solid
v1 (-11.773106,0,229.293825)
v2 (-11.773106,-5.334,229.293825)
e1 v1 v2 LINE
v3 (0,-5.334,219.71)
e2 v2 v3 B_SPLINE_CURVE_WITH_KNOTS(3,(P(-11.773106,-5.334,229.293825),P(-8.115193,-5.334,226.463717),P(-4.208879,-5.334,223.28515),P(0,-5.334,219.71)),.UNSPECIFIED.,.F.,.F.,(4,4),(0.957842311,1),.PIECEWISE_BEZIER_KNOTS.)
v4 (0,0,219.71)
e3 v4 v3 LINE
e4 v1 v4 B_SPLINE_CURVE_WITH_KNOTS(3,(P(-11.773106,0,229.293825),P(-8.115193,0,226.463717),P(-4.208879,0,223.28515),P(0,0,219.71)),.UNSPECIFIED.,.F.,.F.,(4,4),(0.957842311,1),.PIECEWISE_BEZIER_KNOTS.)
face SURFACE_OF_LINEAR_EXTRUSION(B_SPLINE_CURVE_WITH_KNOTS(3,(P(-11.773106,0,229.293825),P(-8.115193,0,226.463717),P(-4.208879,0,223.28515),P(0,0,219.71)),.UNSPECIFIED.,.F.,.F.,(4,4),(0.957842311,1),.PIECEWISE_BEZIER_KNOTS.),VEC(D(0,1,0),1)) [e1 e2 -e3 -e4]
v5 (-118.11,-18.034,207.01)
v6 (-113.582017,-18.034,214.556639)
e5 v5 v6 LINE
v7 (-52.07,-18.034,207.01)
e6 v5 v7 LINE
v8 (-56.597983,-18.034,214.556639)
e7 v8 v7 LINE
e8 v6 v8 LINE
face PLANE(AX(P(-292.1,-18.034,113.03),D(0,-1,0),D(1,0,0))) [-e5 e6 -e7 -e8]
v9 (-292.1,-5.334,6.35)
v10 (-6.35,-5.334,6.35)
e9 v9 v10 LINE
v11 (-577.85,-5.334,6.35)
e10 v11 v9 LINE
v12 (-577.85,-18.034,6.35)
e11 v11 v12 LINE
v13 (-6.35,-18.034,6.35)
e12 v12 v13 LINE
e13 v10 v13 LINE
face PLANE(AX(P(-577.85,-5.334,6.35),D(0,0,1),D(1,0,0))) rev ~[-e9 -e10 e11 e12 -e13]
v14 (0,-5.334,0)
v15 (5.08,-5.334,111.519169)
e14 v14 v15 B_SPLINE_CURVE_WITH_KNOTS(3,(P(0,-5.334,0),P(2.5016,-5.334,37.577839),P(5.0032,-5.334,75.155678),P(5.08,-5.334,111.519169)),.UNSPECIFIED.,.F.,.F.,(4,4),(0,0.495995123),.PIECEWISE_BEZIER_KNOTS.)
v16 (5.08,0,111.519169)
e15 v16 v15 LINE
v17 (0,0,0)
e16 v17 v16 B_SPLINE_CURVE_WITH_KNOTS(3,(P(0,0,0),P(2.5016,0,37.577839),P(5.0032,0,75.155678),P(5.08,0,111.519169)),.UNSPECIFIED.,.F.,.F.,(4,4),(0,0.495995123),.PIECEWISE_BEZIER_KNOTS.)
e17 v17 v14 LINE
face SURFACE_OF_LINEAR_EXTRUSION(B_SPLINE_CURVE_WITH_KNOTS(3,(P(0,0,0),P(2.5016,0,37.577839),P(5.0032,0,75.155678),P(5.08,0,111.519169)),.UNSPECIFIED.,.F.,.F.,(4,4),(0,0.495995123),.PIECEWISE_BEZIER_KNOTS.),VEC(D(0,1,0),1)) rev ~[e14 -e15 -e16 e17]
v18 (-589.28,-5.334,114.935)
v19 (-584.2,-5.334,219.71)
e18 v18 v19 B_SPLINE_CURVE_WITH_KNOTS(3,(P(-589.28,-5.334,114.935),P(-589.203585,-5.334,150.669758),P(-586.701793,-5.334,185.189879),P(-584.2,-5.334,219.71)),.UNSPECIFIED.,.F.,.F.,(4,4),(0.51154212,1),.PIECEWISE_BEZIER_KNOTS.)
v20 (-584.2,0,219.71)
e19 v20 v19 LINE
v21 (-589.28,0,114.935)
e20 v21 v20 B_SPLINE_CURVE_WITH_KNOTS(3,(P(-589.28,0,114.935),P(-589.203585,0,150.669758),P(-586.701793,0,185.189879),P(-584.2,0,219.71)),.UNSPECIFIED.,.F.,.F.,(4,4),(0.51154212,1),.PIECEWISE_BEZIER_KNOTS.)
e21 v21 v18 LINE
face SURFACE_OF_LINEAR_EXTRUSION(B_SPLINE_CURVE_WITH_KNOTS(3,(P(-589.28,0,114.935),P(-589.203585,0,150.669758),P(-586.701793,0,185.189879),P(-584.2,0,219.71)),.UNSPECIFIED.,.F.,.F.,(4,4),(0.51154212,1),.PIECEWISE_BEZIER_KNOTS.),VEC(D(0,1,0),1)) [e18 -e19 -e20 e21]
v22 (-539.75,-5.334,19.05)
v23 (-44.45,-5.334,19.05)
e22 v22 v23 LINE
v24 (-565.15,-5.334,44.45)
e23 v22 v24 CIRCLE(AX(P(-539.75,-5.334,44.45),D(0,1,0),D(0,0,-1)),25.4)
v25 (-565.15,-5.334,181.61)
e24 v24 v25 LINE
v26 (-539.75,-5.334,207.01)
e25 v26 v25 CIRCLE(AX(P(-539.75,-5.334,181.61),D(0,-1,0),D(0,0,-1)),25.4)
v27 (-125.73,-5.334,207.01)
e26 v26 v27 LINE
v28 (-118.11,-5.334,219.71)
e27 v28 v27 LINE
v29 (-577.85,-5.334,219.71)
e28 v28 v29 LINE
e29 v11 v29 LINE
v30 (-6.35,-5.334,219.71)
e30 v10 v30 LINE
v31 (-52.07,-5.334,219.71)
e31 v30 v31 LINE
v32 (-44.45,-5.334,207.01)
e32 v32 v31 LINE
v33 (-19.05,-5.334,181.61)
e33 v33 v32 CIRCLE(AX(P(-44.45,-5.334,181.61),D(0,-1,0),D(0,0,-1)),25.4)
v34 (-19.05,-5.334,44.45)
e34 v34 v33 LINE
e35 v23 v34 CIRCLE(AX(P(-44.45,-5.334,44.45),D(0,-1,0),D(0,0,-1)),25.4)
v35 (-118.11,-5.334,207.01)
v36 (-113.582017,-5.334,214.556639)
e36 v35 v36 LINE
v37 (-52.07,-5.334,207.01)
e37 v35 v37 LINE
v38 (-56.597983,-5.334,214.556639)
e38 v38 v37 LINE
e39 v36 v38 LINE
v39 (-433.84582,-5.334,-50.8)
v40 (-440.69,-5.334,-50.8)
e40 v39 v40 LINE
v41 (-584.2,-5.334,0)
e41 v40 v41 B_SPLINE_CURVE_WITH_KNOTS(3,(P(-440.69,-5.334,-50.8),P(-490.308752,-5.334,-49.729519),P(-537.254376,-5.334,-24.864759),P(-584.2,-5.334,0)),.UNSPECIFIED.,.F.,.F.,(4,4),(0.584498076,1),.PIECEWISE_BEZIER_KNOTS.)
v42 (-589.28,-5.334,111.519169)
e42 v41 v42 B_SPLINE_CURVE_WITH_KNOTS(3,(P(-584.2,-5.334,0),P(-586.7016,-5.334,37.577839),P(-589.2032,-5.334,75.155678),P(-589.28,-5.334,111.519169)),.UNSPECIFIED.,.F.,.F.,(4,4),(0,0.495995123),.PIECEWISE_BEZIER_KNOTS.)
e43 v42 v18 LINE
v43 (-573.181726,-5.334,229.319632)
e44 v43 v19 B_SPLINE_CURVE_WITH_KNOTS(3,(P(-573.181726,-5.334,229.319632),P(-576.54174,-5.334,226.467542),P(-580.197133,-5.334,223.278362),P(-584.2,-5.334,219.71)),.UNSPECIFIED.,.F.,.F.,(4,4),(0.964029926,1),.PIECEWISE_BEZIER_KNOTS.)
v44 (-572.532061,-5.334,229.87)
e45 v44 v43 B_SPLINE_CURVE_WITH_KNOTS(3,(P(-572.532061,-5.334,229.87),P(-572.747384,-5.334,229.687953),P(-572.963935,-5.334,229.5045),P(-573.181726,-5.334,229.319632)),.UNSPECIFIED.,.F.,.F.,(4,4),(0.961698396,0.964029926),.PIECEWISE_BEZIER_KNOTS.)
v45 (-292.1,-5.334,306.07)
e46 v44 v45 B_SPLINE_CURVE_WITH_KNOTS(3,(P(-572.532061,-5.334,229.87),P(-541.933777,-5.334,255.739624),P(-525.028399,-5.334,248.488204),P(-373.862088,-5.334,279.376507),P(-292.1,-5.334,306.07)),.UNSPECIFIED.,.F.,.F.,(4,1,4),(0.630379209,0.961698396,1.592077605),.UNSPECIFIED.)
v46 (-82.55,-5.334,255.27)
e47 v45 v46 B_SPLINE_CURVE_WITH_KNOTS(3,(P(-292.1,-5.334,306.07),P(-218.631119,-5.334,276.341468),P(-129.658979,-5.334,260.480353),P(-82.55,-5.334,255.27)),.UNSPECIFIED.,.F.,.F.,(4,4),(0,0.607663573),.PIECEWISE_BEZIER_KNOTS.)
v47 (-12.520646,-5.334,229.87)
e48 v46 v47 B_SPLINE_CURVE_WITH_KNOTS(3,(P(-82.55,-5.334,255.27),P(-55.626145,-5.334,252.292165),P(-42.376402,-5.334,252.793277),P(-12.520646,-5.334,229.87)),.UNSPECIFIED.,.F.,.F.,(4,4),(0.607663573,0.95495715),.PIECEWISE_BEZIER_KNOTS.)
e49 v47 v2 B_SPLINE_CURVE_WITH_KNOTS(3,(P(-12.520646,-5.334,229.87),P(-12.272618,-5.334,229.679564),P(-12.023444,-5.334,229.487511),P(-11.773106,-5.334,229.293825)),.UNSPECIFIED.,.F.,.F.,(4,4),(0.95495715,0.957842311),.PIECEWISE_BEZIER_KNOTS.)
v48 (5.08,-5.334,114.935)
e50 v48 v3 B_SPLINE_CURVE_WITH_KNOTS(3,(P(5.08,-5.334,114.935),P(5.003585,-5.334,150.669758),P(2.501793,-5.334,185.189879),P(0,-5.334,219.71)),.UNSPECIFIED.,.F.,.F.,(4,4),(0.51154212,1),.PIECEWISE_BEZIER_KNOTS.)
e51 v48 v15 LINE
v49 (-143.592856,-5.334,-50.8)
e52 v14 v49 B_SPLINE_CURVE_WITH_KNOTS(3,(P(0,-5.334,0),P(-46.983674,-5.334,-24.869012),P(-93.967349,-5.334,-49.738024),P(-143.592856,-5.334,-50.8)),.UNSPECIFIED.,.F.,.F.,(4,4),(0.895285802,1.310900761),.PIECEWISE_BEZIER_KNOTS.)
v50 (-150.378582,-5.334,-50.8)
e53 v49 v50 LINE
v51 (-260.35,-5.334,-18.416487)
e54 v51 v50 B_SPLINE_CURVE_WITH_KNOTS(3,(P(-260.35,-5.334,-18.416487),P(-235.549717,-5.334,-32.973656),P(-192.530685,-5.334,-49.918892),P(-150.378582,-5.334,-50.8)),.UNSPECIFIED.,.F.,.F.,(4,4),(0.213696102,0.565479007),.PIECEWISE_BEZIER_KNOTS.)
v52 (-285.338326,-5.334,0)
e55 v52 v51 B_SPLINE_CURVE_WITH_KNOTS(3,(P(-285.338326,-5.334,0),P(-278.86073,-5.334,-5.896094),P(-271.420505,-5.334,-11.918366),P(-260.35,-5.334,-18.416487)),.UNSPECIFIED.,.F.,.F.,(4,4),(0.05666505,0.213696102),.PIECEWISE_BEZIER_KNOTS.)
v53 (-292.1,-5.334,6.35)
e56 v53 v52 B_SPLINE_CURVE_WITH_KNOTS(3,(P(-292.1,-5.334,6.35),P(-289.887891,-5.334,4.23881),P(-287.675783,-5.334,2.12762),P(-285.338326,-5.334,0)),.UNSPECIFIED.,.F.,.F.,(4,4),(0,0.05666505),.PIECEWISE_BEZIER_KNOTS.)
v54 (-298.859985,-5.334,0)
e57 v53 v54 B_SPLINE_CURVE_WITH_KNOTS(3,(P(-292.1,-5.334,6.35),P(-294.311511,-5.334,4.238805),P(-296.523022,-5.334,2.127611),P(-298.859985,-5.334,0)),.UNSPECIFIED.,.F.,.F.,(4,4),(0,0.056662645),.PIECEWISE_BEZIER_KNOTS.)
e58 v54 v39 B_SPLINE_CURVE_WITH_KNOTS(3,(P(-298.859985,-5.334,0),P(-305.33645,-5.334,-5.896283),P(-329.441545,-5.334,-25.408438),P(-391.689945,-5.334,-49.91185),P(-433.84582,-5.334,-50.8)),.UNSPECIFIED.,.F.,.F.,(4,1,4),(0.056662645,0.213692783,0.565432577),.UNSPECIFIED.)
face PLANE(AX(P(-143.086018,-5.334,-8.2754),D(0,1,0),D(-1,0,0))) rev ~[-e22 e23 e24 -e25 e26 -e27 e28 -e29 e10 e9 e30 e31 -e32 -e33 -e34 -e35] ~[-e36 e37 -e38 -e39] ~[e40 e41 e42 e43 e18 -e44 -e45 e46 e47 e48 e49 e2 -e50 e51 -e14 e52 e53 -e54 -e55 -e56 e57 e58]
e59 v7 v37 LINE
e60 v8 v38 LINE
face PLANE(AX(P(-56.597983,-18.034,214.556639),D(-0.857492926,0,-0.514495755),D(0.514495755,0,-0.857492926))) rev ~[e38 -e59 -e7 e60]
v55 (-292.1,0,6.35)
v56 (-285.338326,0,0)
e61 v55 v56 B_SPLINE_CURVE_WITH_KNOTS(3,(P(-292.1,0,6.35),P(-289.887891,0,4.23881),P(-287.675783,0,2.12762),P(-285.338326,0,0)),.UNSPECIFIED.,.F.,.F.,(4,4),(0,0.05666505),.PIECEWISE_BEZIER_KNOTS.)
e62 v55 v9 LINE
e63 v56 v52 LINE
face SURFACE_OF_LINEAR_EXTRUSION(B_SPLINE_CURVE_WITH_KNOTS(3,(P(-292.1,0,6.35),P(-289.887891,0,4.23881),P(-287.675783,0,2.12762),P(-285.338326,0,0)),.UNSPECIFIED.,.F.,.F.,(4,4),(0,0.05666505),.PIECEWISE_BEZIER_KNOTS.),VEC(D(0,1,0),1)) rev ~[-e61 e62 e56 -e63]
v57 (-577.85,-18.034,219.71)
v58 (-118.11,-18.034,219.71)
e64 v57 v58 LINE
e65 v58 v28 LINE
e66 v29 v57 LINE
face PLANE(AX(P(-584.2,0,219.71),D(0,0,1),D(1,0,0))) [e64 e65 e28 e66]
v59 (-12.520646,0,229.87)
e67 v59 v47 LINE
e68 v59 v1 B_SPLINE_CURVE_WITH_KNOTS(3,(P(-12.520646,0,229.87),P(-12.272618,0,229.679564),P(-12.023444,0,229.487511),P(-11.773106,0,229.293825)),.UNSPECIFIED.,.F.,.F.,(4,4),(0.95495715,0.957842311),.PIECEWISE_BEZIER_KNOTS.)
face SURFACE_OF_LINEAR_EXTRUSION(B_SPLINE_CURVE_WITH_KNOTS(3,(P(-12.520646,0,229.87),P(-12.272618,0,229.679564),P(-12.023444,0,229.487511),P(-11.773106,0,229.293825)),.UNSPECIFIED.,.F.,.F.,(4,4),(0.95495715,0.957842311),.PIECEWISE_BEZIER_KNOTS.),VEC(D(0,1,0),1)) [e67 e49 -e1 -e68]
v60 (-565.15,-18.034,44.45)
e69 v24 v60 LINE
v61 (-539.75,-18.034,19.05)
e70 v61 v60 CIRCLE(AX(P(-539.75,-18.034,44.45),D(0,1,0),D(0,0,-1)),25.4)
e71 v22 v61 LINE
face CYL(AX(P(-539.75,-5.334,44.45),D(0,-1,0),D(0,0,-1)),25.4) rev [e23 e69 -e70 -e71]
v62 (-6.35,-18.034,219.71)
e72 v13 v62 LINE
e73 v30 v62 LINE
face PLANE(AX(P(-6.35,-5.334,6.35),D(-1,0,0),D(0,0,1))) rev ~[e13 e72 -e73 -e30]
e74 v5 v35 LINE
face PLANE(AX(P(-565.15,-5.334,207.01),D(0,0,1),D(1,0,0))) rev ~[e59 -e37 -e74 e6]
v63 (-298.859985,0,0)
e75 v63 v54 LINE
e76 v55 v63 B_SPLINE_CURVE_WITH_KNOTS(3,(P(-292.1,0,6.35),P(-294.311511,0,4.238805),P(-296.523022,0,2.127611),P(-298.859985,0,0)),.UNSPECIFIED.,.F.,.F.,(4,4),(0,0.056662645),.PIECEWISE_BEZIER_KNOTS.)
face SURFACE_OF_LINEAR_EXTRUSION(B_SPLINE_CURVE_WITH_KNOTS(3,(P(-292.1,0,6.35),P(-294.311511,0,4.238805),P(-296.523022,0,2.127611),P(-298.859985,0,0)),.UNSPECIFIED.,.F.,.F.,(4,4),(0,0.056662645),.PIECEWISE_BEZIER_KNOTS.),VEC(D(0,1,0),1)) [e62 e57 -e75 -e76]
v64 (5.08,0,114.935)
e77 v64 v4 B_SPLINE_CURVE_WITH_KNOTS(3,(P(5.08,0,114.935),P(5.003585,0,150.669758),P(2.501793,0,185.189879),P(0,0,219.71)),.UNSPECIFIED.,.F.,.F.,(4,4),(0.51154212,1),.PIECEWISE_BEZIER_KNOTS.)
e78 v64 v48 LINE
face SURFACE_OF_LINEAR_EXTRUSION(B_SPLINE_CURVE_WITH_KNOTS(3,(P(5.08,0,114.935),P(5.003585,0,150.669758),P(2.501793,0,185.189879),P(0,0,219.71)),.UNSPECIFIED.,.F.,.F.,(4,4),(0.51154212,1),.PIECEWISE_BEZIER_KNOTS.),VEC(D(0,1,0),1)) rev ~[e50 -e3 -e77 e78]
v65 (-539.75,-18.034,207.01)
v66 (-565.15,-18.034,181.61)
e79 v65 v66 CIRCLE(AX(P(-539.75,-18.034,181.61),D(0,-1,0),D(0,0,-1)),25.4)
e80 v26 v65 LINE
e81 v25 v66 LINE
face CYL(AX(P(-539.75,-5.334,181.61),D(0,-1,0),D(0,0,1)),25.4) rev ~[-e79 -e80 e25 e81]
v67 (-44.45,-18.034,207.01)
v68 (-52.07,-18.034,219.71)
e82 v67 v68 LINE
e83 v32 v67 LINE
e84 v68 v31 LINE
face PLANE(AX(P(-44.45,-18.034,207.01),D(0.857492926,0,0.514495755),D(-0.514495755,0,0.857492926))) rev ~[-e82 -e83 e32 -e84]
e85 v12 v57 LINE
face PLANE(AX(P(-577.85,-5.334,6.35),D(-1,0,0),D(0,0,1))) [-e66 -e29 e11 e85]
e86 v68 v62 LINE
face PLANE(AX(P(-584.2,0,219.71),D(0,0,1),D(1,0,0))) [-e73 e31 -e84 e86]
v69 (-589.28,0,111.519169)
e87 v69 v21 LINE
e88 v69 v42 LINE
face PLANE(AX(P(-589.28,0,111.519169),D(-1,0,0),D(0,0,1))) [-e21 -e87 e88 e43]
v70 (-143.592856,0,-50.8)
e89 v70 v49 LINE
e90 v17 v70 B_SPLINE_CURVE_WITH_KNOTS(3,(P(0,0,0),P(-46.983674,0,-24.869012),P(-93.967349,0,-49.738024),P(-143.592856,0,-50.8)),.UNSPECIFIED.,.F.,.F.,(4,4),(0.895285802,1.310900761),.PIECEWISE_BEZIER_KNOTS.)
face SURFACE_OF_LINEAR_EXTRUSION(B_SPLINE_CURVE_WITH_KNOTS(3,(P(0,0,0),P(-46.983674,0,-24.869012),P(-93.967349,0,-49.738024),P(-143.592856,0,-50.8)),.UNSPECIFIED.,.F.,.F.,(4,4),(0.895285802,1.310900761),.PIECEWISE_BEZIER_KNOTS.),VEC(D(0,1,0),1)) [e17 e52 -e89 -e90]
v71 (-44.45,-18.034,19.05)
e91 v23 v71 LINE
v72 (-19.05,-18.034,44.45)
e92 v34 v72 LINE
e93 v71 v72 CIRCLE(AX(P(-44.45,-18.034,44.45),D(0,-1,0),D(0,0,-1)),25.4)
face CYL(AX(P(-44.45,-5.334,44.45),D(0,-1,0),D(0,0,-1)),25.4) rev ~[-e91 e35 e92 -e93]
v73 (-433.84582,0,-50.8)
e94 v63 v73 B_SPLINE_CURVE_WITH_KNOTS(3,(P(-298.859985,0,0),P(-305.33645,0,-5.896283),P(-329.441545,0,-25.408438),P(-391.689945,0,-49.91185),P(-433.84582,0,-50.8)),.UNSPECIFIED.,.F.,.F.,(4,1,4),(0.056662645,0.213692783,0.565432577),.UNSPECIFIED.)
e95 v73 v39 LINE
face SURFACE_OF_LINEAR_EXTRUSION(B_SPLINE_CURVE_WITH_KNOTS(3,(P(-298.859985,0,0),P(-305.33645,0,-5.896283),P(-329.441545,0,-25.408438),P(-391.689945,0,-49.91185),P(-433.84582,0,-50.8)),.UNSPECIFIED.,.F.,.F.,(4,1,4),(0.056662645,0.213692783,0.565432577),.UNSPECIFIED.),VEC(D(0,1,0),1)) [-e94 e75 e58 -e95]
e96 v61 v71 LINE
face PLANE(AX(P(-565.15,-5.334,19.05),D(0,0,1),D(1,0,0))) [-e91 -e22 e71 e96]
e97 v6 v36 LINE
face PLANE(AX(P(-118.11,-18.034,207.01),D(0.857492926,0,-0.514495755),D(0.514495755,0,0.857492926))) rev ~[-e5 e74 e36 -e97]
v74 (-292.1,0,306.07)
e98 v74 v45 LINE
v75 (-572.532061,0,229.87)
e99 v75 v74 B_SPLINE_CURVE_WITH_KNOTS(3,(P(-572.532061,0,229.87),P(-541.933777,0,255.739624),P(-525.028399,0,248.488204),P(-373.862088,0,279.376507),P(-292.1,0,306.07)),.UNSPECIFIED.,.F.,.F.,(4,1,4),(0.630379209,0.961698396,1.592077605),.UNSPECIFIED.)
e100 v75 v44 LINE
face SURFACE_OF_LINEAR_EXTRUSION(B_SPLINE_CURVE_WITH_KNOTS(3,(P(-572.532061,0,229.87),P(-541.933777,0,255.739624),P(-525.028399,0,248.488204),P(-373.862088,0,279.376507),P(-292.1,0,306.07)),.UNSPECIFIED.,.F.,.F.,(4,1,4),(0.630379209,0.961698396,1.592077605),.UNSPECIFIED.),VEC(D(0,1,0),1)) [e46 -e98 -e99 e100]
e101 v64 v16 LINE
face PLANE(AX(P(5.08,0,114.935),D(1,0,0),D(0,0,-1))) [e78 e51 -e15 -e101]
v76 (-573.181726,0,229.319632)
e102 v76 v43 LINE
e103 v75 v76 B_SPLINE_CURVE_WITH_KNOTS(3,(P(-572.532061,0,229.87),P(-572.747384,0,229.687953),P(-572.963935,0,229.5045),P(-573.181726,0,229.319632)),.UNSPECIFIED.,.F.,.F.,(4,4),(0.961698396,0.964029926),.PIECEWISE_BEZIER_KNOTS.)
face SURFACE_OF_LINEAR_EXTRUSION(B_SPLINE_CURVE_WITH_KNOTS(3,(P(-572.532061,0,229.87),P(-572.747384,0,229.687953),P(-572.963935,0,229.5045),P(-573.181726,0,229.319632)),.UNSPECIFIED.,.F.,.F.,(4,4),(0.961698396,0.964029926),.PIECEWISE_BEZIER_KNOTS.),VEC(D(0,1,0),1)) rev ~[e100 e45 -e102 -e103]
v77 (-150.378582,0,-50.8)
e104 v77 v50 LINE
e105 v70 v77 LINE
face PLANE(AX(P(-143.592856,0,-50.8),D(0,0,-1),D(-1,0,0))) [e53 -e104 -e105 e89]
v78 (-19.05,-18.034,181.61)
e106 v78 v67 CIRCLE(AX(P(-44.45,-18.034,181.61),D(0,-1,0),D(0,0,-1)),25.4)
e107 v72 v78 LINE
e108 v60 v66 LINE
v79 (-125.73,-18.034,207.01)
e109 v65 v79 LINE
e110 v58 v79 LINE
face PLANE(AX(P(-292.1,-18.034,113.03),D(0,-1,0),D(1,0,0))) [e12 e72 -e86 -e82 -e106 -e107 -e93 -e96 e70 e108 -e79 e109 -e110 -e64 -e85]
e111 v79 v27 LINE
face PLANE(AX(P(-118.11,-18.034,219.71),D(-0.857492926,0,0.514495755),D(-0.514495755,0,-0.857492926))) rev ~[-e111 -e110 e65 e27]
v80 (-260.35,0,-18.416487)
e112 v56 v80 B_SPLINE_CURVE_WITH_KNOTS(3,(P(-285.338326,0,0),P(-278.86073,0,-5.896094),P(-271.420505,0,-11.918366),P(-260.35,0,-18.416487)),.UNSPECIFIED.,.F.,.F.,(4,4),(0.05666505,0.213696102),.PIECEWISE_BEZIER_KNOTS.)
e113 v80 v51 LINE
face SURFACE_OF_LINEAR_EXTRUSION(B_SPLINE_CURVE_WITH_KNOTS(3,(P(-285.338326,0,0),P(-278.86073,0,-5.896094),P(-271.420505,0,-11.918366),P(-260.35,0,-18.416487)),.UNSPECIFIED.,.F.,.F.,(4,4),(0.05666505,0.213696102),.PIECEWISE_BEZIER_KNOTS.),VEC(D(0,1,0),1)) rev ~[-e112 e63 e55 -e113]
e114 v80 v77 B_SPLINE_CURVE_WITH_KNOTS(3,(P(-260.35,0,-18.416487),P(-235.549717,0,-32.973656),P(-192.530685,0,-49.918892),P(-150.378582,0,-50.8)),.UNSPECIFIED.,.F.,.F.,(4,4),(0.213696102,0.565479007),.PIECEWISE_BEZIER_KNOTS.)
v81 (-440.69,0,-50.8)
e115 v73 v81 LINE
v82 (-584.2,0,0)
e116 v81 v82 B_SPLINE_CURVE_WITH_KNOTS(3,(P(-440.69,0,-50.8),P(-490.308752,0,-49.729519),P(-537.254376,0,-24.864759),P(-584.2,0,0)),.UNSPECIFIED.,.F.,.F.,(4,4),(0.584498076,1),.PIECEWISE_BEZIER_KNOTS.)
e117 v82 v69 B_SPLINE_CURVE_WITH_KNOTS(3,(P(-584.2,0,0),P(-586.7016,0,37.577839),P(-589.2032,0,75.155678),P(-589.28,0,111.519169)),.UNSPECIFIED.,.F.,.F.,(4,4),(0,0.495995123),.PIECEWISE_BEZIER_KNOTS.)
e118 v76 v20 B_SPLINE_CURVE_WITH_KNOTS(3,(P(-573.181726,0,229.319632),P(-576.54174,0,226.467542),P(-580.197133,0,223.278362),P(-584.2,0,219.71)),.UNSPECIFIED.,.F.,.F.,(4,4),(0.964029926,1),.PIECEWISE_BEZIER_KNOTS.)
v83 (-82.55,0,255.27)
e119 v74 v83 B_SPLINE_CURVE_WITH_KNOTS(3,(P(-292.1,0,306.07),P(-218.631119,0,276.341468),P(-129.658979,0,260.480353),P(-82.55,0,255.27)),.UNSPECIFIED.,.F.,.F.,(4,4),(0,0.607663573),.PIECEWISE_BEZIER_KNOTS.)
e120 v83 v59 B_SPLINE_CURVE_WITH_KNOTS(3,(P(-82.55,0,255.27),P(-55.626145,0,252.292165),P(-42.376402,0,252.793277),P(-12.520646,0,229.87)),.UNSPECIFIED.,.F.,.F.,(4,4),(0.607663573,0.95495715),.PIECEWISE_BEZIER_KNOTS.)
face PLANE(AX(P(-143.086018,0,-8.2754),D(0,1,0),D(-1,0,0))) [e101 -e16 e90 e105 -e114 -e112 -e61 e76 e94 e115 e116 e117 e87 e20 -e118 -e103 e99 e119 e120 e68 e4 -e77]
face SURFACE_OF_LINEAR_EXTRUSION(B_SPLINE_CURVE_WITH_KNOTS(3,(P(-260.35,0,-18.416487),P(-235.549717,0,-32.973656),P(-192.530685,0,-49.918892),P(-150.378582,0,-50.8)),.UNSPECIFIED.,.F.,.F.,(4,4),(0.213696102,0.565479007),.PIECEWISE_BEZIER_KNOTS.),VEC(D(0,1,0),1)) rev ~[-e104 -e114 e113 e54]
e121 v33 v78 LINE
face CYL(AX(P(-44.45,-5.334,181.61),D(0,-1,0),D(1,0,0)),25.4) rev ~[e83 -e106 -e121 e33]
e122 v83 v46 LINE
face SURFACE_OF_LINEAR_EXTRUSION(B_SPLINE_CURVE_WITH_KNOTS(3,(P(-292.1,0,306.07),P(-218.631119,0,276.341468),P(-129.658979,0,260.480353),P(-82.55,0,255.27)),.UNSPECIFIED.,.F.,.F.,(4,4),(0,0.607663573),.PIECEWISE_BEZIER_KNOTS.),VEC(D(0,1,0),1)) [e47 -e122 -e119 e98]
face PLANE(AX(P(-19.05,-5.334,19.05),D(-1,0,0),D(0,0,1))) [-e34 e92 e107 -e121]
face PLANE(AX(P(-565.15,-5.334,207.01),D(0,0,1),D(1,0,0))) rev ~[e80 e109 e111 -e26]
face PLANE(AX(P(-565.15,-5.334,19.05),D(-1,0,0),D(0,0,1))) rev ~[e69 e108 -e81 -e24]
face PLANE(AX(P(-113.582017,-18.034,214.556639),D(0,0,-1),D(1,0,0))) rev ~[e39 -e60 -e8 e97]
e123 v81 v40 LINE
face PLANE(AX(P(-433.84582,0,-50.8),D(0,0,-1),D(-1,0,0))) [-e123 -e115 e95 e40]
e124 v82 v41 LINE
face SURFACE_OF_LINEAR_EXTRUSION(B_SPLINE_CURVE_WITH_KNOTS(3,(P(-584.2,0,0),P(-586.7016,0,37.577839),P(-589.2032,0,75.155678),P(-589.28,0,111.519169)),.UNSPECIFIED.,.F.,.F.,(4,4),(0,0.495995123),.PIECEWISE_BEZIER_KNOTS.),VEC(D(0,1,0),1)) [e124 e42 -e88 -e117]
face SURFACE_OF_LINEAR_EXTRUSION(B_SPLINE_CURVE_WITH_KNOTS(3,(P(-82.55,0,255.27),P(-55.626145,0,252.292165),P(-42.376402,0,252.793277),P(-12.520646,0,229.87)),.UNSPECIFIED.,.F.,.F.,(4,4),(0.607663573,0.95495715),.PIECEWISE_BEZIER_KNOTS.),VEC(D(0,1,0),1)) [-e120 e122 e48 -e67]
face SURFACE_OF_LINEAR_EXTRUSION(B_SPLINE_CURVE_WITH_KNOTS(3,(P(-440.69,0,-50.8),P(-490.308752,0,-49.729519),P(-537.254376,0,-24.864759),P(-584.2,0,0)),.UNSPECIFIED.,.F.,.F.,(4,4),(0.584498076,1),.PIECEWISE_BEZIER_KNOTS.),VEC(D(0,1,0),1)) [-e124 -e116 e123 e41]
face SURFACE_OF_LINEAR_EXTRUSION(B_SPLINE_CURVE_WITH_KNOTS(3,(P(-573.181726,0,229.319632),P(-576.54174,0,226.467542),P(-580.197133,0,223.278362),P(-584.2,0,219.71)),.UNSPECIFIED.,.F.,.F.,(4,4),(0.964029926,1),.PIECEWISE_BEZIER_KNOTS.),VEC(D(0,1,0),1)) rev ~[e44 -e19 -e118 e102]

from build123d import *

# Parameters (mm, degrees)
F0_W     = 584.2
F0_H     = 219.71
F1_DEPTH = 5.334
F2_W     = 571.5
F2_H     = 213.36
F2_W_2   = 546.1
F2_H_2   = 187.96
F3_DEPTH = 12.7
F4_R     = 25.4
F6_DEPTH = 12.7
F8_DEPTH = 5.334
F9_DEPTH = 5.334


# Not quite as in the source:
# - a feature names something its author has since deleted; it is built from what else it names


with BuildPart() as f1:
    # F0 (on Front) → F1 (new body)
    with BuildSketch(Plane.XZ):
        with Locations((-292.1, 109.855)):
            Rectangle(F0_W, F0_H)
    extrude(amount=F1_DEPTH)

    # F2 (on face) → F3 (join)
    with BuildSketch(Plane.XZ.offset(5.334)):
        with Locations((-292.1, 113.03)):
            Rectangle(F2_W, F2_H)
        with Locations((-292.1, 113.03)):
            Rectangle(F2_W_2, F2_H_2, mode=Mode.SUBTRACT)
    extrude(amount=F3_DEPTH)

    # F4
    f4_edges = [f1.edges().sort_by_distance(p)[0] for p in [
        (-565.15, -11.684, 207.01),
        (-19.05, -11.684, 207.01),
        (-19.05, -11.684, 19.05),
        (-565.15, -11.684, 19.05),
    ]]
    fillet(f4_edges, radius=F4_R)

    # F5 (on face) → F6 (cut)
    with BuildSketch(Plane.XZ.offset(18.034)):
        Polygon((-118.11, 219.71), (-125.73, 207.01), (-118.11, 207.01), (-113.5820166854, 214.5566388576), (-110.49, 219.71), align=None)
        Polygon((-56.5979833146, 214.5566388576), (-52.07, 207.01), (-44.45, 207.01), (-52.07, 219.71), (-59.69, 219.71), align=None)
        Polygon((-59.69, 219.71), (-110.49, 219.71), (-113.5820166854, 214.5566388576), (-56.5979833146, 214.5566388576), align=None)
    extrude(amount=-F6_DEPTH, mode=Mode.SUBTRACT)

    # F7 (on face) → F8 (cut)
    with BuildSketch(Plane(origin=(0, 0, 0), x_dir=(-1, 0, 0), z_dir=(0, 1, 0))):
        with BuildLine():
            add(Edge.make_bspline(
                [(292.1, 6.35), (289.8878914708, 4.2388101088), (287.6757829415, 2.1276202176), (285.3383261504, 0)],
                knots=[0, 0, 0, 0, 0.0566650496, 0.0566650496, 0.0566650496, 0.0566650496], degree=3))
            Line((285.3383261504, 0), (292.1, 0))
            Line((292.1, 0), (292.1, 6.35))
        make_face()
        with BuildLine():
            add(Edge.make_bspline(
                [(292.1, 6.35), (294.3115112442, 4.2388053382), (296.5230224884, 2.1276106765), (298.8599853109, 0)],
                knots=[0, 0, 0, 0, 0.056662645, 0.056662645, 0.056662645, 0.056662645], degree=3))
            Line((292.1, 6.35), (292.1, 0))
            Line((292.1, 0), (298.8599853109, 0))
        make_face()
    extrude(amount=-F8_DEPTH, mode=Mode.SUBTRACT)

    # F7 (on face) → F9 (join)
    with BuildSketch(Plane(origin=(0, 0, 0), x_dir=(-1, 0, 0), z_dir=(0, 1, 0))):
        with BuildLine():
            Line((285.3383261504, 0), (0, 0))
            add(Edge.make_bspline(
                [(35.5548654074, -18.4164866805), (23.6750755263, -12.5314961521), (11.8375377632, -6.265748076), (0, 0)],
                knots=[0.8952858021, 0.8952858021, 0.8952858021, 0.8952858021, 1, 1, 1, 1], degree=3))
            Line((35.5548654074, -18.4164866805), (260.35, -18.4164866805))
            add(Edge.make_bspline(
                [(285.3383261504, 0), (278.8607301271, -5.8960937002), (271.4205053001, -11.9183662972), (260.35, -18.4164866805)],
                knots=[0.0566650496, 0.0566650496, 0.0566650496, 0.0566650496, 0.2136961022, 0.2136961022, 0.2136961022, 0.2136961022], degree=3))
        make_face()
        with BuildLine():
            add(Edge.make_bspline(
                [(0, 0), (-2.5016001756, 37.5778391816), (-5.0032003512, 75.1556783631), (-5.08, 111.5191693883)],
                knots=[0, 0, 0, 0, 0.4959951232, 0.4959951232, 0.4959951232, 0.4959951232], degree=3))
            Line((0, 0), (0, 219.71))
            add(Edge.make_bspline(
                [(-5.08, 114.935), (-5.0035853497, 150.6697582461), (-2.5017926748, 185.189879123), (0, 219.71)],
                knots=[0.5115421197, 0.5115421197, 0.5115421197, 0.5115421197, 1, 1, 1, 1], degree=3))
            Line((-5.08, 114.935), (-5.08, 111.5191693883))
        make_face()
        with BuildLine():
            Line((260.35, -18.4164866805), (35.5548654074, -18.4164866805))
            add(Edge.make_bspline(
                [(143.5928555626, -50.8), (106.470496214, -50.0055886792), (70.8264502644, -35.8892656507), (35.5548654074, -18.4164866805)],
                knots=[0.5843850409, 0.5843850409, 0.5843850409, 0.5843850409, 0.8952858021, 0.8952858021, 0.8952858021, 0.8952858021], degree=3))
            Line((143.5928555626, -50.8), (150.3785817486, -50.8))
            add(Edge.make_bspline(
                [(260.35, -18.4164866805), (235.5497171967, -32.973656279), (192.5306851802, -49.9188924594), (150.3785817486, -50.8)],
                knots=[0.2136961022, 0.2136961022, 0.2136961022, 0.2136961022, 0.5654790071, 0.5654790071, 0.5654790071, 0.5654790071], degree=3))
        make_face()
        with BuildLine():
            add(Edge.make_bspline(
                [(11.7731056729, 229.2938254471), (8.1151931686, 226.4637173569), (4.2088787391, 223.2851496368), (0, 219.71)],
                knots=[0.9578423111, 0.9578423111, 0.9578423111, 0.9578423111, 1, 1, 1, 1], degree=3))
            Line((0, 219.71), (292.1, 219.71))
            Line((292.1, 219.71), (11.7731056729, 229.2938254471))
        make_face()
        with BuildLine():
            add(Edge.make_bspline(
                [(12.5206463088, 229.87), (12.2726179558, 229.6795636028), (12.0234435309, 229.4875105602), (11.7731056729, 229.2938254471)],
                knots=[0.9549571504, 0.9549571504, 0.9549571504, 0.9549571504, 0.9578423111, 0.9578423111, 0.9578423111, 0.9578423111], degree=3))
            Line((11.7731056729, 229.2938254471), (292.1, 219.71))
            Line((292.1, 219.71), (573.1817260974, 229.3196316614))
            add(Edge.make_bspline(
                [(572.5320605941, 229.87), (572.7473841939, 229.6879525114), (572.9639346328, 229.5045002197), (573.1817260974, 229.3196316614)],
                knots=[0.9616983958, 0.9616983958, 0.9616983958, 0.9616983958, 0.9640299265, 0.9640299265, 0.9640299265, 0.9640299265], degree=3))
            Line((572.5320605941, 229.87), (514.35, 229.87))
            Line((514.35, 229.87), (292.1, 229.87))
            Line((292.1, 229.87), (82.55, 229.87))
            Line((82.55, 229.87), (12.5206463088, 229.87))
        make_face()
        with BuildLine():
            Line((573.1817260974, 229.3196316614), (292.1, 219.71))
            Line((292.1, 219.71), (584.2, 219.71))
            add(Edge.make_bspline(
                [(573.1817260974, 229.3196316614), (576.5417396252, 226.4675416698), (580.1971331881, 223.2783621084), (584.2, 219.71)],
                knots=[0.9640299265, 0.9640299265, 0.9640299265, 0.9640299265, 1, 1, 1, 1], degree=3))
        make_face()
        with BuildLine():
            add(Edge.make_bspline(
                [(298.8599853109, 0), (305.3364495341, -5.8962831133), (312.7764065366, -11.9186444461), (323.85, -18.4164866805)],
                knots=[0.056662645, 0.056662645, 0.056662645, 0.056662645, 0.2136927825, 0.2136927825, 0.2136927825, 0.2136927825], degree=3))
            Line((323.85, -18.4164866805), (548.6673215949, -18.4164866805))
            add(Edge.make_bspline(
                [(548.6673215949, -18.4164866805), (560.540064076, -12.5314899408), (572.370032038, -6.2657449704), (584.2, 0)],
                knots=[0.8952964295, 0.8952964295, 0.8952964295, 0.8952964295, 1, 1, 1, 1], degree=3))
            Line((584.2, 0), (298.8599853109, 0))
        make_face()
        with BuildLine():
            Line((548.6673215949, -18.4164866805), (323.85, -18.4164866805))
            add(Edge.make_bspline(
                [(323.85, -18.4164866805), (348.6543054028, -32.9713340996), (391.6899454814, -49.9118498543), (433.8458201185, -50.8)],
                knots=[0.2136927825, 0.2136927825, 0.2136927825, 0.2136927825, 0.5654325768, 0.5654325768, 0.5654325768, 0.5654325768], degree=3))
            Line((433.8458201185, -50.8), (440.69, -50.8))
            add(Edge.make_bspline(
                [(440.69, -50.8), (477.8051745876, -49.9992725657), (513.4246952416, -35.8853016167), (548.6673215949, -18.4164866805)],
                knots=[0.5844980763, 0.5844980763, 0.5844980763, 0.5844980763, 0.8952964295, 0.8952964295, 0.8952964295, 0.8952964295], degree=3))
        make_face()
        with BuildLine():
            add(Edge.make_bspline(
                [(82.55, 255.27), (55.6261452853, 252.2921647864), (42.3764019315, 252.7932765823), (12.5206463088, 229.87)],
                knots=[0.6076635734, 0.6076635734, 0.6076635734, 0.6076635734, 0.9549571504, 0.9549571504, 0.9549571504, 0.9549571504], degree=3))
            Line((12.5206463088, 229.87), (82.55, 229.87))
            Line((82.55, 229.87), (82.55, 255.27))
        make_face()
        with BuildLine():
            add(Edge.make_bspline(
                [(589.28, 114.935), (589.2035853497, 150.6697582461), (586.7017926748, 185.189879123), (584.2, 219.71)],
                knots=[0.5115421197, 0.5115421197, 0.5115421197, 0.5115421197, 1, 1, 1, 1], degree=3))
            Line((584.2, 219.71), (584.2, 0))
            add(Edge.make_bspline(
                [(584.2, 0), (586.7016001756, 37.5778391816), (589.2032003512, 75.1556783632), (589.28, 111.5191693884)],
                knots=[0, 0, 0, 0, 0.4959951232, 0.4959951232, 0.4959951232, 0.4959951232], degree=3))
            Line((589.28, 111.5191693884), (589.28, 114.935))
        make_face()
        with BuildLine():
            Line((82.55, 255.27), (82.55, 229.87))
            Line((82.55, 229.87), (292.1, 229.87))
            Line((292.1, 229.87), (292.1, 306.07))
            add(Edge.make_bspline(
                [(292.1, 306.07), (218.631118536, 276.3414680958), (129.6589788413, 260.4803525873), (82.55, 255.27)],
                knots=[0, 0, 0, 0, 0.6076635734, 0.6076635734, 0.6076635734, 0.6076635734], degree=3))
        make_face()
        with BuildLine():
            Line((514.35, 229.87), (572.5320605941, 229.87))
            add(Edge.make_bspline(
                [(514.35, 255.27), (536.1096268059, 253.2414037435), (541.9337770664, 255.7396244938), (572.5320605941, 229.87)],
                knots=[0.6303792087, 0.6303792087, 0.6303792087, 0.6303792087, 0.9616983958, 0.9616983958, 0.9616983958, 0.9616983958], degree=3))
            Line((514.35, 255.27), (514.35, 229.87))
        make_face()
        with BuildLine():
            Line((292.1, 306.07), (292.1, 229.87))
            Line((292.1, 229.87), (514.35, 229.87))
            Line((514.35, 229.87), (514.35, 255.27))
            add(Edge.make_bspline(
                [(292.1, 306.07), (373.8620877266, 279.3765068054), (472.9493903602, 259.129676569), (514.35, 255.27)],
                knots=[0, 0, 0, 0, 0.6303792087, 0.6303792087, 0.6303792087, 0.6303792087], degree=3))
        make_face()
    extrude(amount=-F9_DEPTH)


solid = f1.part
